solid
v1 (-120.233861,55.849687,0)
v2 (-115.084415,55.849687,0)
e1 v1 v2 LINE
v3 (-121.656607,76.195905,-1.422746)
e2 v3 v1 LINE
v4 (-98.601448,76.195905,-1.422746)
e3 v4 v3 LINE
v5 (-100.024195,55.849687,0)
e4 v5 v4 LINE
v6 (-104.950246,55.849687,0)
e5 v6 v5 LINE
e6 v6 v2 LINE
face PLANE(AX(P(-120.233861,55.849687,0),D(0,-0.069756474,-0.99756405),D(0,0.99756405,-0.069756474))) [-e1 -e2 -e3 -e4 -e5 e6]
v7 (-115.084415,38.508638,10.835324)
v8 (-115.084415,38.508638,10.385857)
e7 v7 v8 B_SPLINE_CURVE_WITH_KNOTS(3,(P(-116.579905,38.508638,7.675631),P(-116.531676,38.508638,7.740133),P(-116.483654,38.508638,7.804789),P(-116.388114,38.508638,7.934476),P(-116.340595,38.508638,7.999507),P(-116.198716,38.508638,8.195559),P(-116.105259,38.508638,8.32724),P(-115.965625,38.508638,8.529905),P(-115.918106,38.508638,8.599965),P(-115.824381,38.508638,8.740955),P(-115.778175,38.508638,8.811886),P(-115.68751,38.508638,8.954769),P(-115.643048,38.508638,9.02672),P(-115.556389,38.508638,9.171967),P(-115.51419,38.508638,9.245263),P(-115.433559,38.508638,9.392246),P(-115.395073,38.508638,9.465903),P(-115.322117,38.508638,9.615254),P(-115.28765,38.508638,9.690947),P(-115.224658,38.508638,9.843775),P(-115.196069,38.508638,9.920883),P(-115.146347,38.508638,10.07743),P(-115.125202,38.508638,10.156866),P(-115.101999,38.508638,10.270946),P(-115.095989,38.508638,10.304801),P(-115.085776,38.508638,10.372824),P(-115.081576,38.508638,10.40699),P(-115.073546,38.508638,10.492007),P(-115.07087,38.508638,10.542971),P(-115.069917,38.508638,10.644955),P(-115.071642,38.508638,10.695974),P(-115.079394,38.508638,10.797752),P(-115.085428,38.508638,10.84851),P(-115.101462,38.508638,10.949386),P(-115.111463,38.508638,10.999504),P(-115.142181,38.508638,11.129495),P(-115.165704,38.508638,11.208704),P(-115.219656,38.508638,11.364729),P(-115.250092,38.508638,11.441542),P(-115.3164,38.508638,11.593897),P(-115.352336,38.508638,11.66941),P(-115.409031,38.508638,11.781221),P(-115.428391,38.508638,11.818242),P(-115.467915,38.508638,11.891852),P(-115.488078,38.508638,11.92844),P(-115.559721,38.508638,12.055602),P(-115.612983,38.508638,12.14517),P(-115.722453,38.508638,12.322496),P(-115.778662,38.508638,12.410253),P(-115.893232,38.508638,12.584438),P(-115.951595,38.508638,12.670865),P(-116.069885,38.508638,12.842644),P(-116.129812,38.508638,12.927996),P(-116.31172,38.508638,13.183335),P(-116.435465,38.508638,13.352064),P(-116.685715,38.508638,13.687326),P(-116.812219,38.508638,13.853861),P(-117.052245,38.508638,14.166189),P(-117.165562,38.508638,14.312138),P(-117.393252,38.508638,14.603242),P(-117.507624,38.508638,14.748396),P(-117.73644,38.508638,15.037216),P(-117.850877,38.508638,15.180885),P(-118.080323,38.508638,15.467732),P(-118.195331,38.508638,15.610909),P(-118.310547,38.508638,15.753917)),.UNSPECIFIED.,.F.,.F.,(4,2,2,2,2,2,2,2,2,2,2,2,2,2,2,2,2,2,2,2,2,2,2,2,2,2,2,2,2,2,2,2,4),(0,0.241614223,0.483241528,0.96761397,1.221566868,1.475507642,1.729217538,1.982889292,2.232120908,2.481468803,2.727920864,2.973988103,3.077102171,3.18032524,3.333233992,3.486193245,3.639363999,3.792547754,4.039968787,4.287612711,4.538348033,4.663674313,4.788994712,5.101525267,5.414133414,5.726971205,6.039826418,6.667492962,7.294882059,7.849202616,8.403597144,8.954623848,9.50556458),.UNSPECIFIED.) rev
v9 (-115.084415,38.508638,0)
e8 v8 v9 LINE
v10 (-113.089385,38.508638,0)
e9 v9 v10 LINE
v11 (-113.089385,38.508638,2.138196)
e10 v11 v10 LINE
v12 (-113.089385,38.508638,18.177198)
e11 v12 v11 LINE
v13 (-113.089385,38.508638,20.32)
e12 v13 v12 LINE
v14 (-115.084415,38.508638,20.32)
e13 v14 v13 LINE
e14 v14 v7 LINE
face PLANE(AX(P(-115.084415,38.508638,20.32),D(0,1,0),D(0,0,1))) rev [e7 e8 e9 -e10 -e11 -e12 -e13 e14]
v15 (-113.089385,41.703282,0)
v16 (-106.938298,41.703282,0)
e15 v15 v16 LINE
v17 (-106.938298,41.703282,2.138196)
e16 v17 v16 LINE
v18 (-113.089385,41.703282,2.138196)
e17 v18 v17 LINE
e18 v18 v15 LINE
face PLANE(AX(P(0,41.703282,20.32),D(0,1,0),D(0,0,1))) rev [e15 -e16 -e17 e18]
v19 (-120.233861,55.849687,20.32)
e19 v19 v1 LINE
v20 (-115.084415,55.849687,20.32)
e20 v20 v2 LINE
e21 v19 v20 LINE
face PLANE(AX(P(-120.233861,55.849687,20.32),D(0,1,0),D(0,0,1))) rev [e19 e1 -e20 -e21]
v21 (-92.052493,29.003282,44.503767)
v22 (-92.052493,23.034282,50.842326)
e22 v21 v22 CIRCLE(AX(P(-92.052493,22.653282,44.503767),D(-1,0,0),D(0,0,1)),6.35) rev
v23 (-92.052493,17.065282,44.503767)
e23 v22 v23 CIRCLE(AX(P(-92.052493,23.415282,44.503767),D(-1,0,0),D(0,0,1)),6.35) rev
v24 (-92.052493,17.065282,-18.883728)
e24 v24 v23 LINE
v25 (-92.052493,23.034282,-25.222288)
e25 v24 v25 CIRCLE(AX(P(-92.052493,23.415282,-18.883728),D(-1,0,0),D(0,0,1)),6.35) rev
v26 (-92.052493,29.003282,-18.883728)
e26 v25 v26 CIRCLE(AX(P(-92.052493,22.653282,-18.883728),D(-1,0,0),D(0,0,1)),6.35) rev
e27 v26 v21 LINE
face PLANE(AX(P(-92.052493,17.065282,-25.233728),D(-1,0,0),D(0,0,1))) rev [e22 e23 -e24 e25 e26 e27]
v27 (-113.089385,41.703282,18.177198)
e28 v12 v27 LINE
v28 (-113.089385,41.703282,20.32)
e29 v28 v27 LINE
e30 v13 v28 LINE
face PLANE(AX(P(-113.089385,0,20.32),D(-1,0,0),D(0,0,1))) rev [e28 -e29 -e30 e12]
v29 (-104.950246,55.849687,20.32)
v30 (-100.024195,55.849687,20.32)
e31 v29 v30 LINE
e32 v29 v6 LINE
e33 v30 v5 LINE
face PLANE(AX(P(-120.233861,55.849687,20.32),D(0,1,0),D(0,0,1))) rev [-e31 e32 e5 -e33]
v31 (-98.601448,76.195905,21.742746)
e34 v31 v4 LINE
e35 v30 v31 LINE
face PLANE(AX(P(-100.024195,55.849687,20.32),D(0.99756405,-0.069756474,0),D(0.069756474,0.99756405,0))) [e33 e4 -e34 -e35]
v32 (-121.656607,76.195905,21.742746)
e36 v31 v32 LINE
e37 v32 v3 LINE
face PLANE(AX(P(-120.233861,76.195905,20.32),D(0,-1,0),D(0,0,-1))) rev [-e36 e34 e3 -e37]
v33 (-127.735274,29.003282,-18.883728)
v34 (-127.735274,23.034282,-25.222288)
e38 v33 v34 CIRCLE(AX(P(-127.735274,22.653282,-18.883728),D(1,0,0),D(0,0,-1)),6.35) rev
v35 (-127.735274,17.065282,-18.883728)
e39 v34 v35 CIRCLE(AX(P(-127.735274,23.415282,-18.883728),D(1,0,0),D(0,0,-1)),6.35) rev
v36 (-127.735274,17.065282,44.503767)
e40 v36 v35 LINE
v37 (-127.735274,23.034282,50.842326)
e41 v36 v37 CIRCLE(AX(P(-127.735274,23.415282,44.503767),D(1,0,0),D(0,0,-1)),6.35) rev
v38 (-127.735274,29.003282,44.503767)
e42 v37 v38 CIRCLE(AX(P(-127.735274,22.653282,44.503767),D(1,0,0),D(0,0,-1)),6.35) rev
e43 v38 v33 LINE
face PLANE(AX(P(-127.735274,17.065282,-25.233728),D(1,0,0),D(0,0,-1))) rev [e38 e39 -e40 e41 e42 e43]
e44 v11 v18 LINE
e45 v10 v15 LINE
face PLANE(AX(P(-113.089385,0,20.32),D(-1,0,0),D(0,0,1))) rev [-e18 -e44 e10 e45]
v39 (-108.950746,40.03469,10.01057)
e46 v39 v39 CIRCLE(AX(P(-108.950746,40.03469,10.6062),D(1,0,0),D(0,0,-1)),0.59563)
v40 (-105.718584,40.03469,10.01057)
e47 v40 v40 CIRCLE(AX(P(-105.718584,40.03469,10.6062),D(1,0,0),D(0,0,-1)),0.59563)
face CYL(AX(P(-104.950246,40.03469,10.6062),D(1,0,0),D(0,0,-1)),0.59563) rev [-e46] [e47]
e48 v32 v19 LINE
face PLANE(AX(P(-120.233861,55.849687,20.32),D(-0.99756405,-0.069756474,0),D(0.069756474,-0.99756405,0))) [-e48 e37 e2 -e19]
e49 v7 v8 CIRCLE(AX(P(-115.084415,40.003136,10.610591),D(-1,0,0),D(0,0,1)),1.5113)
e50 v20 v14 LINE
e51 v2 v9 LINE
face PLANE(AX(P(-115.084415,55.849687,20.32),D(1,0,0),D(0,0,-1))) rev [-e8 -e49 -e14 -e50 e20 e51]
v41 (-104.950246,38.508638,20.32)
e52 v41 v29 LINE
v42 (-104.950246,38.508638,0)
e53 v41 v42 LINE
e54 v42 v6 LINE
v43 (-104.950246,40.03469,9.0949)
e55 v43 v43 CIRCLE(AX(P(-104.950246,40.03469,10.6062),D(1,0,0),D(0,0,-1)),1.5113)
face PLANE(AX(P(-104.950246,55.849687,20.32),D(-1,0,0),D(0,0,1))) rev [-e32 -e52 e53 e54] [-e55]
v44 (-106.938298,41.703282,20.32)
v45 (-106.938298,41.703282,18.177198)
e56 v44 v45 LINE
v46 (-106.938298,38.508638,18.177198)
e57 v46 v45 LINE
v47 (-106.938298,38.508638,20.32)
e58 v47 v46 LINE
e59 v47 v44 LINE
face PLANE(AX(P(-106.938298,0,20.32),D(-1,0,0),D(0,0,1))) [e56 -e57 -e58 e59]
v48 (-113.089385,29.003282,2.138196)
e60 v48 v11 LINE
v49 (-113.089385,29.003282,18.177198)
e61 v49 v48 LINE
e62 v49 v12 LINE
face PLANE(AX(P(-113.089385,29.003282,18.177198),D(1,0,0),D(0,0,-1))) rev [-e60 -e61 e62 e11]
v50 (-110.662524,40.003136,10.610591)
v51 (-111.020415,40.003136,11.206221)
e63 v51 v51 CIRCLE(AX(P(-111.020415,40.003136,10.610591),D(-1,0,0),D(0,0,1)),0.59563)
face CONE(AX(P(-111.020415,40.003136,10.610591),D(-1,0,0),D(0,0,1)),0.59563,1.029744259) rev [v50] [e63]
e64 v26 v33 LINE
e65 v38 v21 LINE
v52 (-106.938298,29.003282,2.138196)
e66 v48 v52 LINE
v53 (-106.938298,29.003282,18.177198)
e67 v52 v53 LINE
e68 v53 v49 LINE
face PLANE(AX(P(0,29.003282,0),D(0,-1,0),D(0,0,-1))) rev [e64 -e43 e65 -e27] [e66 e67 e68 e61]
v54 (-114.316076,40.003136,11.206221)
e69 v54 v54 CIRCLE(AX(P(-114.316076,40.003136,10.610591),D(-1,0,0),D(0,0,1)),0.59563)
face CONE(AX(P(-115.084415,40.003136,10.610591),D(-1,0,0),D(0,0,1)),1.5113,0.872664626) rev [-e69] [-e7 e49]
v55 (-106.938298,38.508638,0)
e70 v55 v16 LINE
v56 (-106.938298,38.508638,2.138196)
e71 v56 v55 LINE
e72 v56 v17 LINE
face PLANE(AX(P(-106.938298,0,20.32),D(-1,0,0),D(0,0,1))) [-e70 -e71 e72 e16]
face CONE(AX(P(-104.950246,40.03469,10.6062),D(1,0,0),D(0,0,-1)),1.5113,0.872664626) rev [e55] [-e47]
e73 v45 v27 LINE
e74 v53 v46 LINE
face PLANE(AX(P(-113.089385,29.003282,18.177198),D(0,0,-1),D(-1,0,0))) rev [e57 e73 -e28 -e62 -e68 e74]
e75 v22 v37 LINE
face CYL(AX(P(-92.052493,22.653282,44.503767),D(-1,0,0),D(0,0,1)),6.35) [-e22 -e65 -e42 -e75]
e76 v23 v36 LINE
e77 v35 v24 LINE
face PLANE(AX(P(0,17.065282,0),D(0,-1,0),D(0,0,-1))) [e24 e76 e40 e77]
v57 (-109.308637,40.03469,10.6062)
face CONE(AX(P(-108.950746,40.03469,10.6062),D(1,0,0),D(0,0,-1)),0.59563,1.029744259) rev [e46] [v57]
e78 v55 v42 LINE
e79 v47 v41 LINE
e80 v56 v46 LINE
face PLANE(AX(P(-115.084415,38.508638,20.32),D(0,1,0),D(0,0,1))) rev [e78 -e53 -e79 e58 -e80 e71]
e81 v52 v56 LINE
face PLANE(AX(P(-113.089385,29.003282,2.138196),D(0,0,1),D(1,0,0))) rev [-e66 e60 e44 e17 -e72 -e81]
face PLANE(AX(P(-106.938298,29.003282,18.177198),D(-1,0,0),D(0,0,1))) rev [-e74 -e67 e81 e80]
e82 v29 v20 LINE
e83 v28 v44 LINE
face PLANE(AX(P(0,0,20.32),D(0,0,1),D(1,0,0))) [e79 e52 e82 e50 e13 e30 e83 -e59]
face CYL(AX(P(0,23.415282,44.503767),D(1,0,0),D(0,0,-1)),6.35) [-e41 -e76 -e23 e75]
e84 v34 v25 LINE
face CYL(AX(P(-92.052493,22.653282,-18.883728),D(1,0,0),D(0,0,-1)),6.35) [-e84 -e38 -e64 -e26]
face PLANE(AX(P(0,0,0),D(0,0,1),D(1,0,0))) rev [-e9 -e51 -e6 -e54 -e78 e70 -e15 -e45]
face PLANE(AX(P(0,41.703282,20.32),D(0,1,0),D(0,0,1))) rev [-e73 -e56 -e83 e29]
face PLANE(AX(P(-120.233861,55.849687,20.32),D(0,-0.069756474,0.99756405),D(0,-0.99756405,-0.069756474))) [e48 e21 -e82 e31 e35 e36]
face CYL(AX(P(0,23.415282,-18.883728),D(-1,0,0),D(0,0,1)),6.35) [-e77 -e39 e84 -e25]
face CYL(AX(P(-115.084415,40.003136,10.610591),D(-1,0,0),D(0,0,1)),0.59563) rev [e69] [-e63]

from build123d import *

# Parameters (mm, degrees)
SKETCH5_W                       = 20.209666631
SKETCH5_H                       = 20.346218433
BOSS_EXTRUDE3_DEPTH             = 20.32
DRAFT4_ANGLE                    = 4
DRAFT5_ANGLE                    = 4
SKETCH6_W                       = 10.134168445
SKETCH6_H                       = 17.341048708
BOSS_EXTRUDE4_DEPTH             = 20.32
SKETCH7_W                       = 6.151087315
SKETCH7_H                       = 12.30217463
BOSS_EXTRUDE5_DEPTH             = 20.32
CUT_EXTRUDE1_DEPTH              = 20.32
SKETCH9_W                       = 6.151087315
SKETCH9_H                       = 16.039002112
BOSS_EXTRUDE8_DEPTH             = 12.7
F_0_80_TAPPED_HOLE1_D           = 1.19126
F_0_80_TAPPED_HOLE1_DEPTH       = 4.0005
F_0_80_TAPPED_HOLE1_CSINK_D     = 3.0226
F_0_80_TAPPED_HOLE1_CSINK_ANGLE = 100
F_0_80_TAPPED_HOLE1_TIP         = 0.357890611
F_0_80_TAPPED_HOLE3_D           = 1.19126
F_0_80_TAPPED_HOLE3_DEPTH       = 4.064
F_0_80_TAPPED_HOLE3_CSINK_D     = 3.0226
F_0_80_TAPPED_HOLE3_CSINK_ANGLE = 100
F_0_80_TAPPED_HOLE3_TIP         = 0.357890611
SKETCH28_W                      = 35.682781241
SKETCH28_H                      = 76.087494434
BOSS_EXTRUDE13_DEPTH            = 11.938
FILLET5_R                       = 6.35
FILLET6_R                       = 6.35


with BuildPart() as part:
    # Sketch5 → Boss-Extrude3 (new body)
    with BuildSketch(Plane.XY):
        with Locations((-110.129027961, 66.022796056)):
            Rectangle(SKETCH5_W, SKETCH5_H)
    extrude(amount=BOSS_EXTRUDE3_DEPTH)

    # Draft4
    draft4_faces = [part.faces().sort_by_distance(p)[0] for p in [
        (-100.024194645, 66.022796056, 10.16),
        (-120.233861276, 66.022796056, 10.16),
        (-110.129027961, 66.022796056, 20.32),
    ]]
    draft(draft4_faces, Plane(origin=(-120.233861276, 55.849686839, 20.32), x_dir=(0, 0, -1), z_dir=(0, -1, 0)), DRAFT4_ANGLE)

    # Draft5
    draft5_faces = [part.faces().sort_by_distance(p)[0] for p in [
        (-110.129027961, 66.245821761, 0),
    ]]
    draft(draft5_faces, Plane(origin=(-120.233861276, 55.849686839, 20.32), x_dir=(0, 0, -1), z_dir=(0, -1, 0)), DRAFT5_ANGLE)

    # Sketch6 → Boss-Extrude4 (add)
    with BuildSketch(Plane.XY):
        with Locations((-110.017330359, 47.179162485)):
            Rectangle(SKETCH6_W, SKETCH6_H)
    extrude(amount=BOSS_EXTRUDE4_DEPTH)

    # Sketch7 → Boss-Extrude5 (add)
    with BuildSketch(Plane.XY):
        with Locations((-110.013841195, 32.357550816)):
            Rectangle(SKETCH7_W, SKETCH7_H)
    extrude(amount=BOSS_EXTRUDE5_DEPTH)

    # Sketch8 → Cut-Extrude1 (cut)
    with BuildSketch(Plane(origin=(0, 0, 0), x_dir=(-1, 0, 0), z_dir=(0, 0, -1))):
        Polygon((113.089384852, 38.508638131), (113.089384852, 41.703281679), (106.938297537, 41.703281679), (106.938297537, 38.508638131), (106.938297537, 26.206463501), (113.089384852, 26.206463501), align=None)
    extrude(amount=-CUT_EXTRUDE1_DEPTH, mode=Mode.SUBTRACT)

    # Sketch9 → Boss-Extrude8 (add)
    with BuildSketch(Plane.XZ.offset(-41.703281679)):
        with Locations((-110.013841195, 10.15769714)):
            Rectangle(SKETCH9_W, SKETCH9_H)
    extrude(amount=BOSS_EXTRUDE8_DEPTH)

    # #0-80 Tapped Hole1
    with Locations(Plane(origin=(-104.950246136, 0, 0), x_dir=(0, 0, -1), z_dir=(1, 0, 0))):
        with Locations((-10.606199537, 40.03468966)):
            CounterSinkHole(F_0_80_TAPPED_HOLE1_D / 2, F_0_80_TAPPED_HOLE1_CSINK_D / 2, depth=F_0_80_TAPPED_HOLE1_DEPTH, counter_sink_angle=F_0_80_TAPPED_HOLE1_CSINK_ANGLE)
            with Locations((0, 0, -(F_0_80_TAPPED_HOLE1_DEPTH + F_0_80_TAPPED_HOLE1_TIP / 2))):  # 118° drill point
                Cone(0, F_0_80_TAPPED_HOLE1_D / 2, F_0_80_TAPPED_HOLE1_TIP, mode=Mode.SUBTRACT)

    # #0-80 Tapped Hole3
    with Locations(Plane.ZY.offset(115.084414581)):
        with Locations((10.610590501, 40.003135548)):
            CounterSinkHole(F_0_80_TAPPED_HOLE3_D / 2, F_0_80_TAPPED_HOLE3_CSINK_D / 2, depth=F_0_80_TAPPED_HOLE3_DEPTH, counter_sink_angle=F_0_80_TAPPED_HOLE3_CSINK_ANGLE)
            with Locations((0, 0, -(F_0_80_TAPPED_HOLE3_DEPTH + F_0_80_TAPPED_HOLE3_TIP / 2))):  # 118° drill point
                Cone(0, F_0_80_TAPPED_HOLE3_D / 2, F_0_80_TAPPED_HOLE3_TIP, mode=Mode.SUBTRACT)

    # Sketch28 → Boss-Extrude13 (add)
    with BuildSketch(Plane(origin=(0, 29.003281679, 0), x_dir=(-1, 0, 0), z_dir=(0, -1, 0))):
        with Locations((109.89388319, -12.810019293)):
            Rectangle(SKETCH28_W, SKETCH28_H)
    extrude(amount=BOSS_EXTRUDE13_DEPTH)

    # Fillet5
    # the kernel refuses this fillet: 6.35 mm, written as the material it takes off along each edge
    with BuildSketch(Plane(origin=(-76.177492569, 17.065281679, -25.233727924), x_dir=(0, 1, 0), z_dir=(-1, 0, 0))) as fillet5_piece_1:
        with BuildLine():
            CenterArc((FILLET5_R, -FILLET5_R), FILLET5_R, 90, 90)
            Line((0, -FILLET5_R), (0, 0))
            Line((0, 0), (FILLET5_R, 0))
        make_face()
    extrude(amount=67.43278124, mode=Mode.SUBTRACT)
    with BuildSketch(Plane(origin=(-76.177492569, 29.003281679, -25.233727924), x_dir=(0, -1, 0), z_dir=(-1, 0, 0))) as fillet5_piece_2:
        with BuildLine():
            CenterArc((FILLET5_R, FILLET5_R), FILLET5_R, 180, 90)
            Line((0, FILLET5_R), (0, 0))
            Line((0, 0), (FILLET5_R, 0))
        make_face()
    extrude(amount=67.43278124, mode=Mode.SUBTRACT)

    # Fillet6
    # the kernel refuses this fillet: 6.35 mm, written as the material it takes off along each edge
    with BuildSketch(Plane(origin=(-143.61027381, 17.065281679, 50.85376651), x_dir=(0, 1, 0), z_dir=(1, 0, 0)), Plane(origin=(-143.61027381, 29.003281679, 50.85376651), x_dir=(0, 0, -1), z_dir=(1, 0, 0))) as fillet6_piece_1:
        with BuildLine():
            CenterArc((FILLET6_R, -FILLET6_R), FILLET6_R, 90, 90)
            Line((0, -FILLET6_R), (0, 0))
            Line((0, 0), (FILLET6_R, 0))
        make_face()
    extrude(amount=67.43278124, mode=Mode.SUBTRACT)


solid = part.part
